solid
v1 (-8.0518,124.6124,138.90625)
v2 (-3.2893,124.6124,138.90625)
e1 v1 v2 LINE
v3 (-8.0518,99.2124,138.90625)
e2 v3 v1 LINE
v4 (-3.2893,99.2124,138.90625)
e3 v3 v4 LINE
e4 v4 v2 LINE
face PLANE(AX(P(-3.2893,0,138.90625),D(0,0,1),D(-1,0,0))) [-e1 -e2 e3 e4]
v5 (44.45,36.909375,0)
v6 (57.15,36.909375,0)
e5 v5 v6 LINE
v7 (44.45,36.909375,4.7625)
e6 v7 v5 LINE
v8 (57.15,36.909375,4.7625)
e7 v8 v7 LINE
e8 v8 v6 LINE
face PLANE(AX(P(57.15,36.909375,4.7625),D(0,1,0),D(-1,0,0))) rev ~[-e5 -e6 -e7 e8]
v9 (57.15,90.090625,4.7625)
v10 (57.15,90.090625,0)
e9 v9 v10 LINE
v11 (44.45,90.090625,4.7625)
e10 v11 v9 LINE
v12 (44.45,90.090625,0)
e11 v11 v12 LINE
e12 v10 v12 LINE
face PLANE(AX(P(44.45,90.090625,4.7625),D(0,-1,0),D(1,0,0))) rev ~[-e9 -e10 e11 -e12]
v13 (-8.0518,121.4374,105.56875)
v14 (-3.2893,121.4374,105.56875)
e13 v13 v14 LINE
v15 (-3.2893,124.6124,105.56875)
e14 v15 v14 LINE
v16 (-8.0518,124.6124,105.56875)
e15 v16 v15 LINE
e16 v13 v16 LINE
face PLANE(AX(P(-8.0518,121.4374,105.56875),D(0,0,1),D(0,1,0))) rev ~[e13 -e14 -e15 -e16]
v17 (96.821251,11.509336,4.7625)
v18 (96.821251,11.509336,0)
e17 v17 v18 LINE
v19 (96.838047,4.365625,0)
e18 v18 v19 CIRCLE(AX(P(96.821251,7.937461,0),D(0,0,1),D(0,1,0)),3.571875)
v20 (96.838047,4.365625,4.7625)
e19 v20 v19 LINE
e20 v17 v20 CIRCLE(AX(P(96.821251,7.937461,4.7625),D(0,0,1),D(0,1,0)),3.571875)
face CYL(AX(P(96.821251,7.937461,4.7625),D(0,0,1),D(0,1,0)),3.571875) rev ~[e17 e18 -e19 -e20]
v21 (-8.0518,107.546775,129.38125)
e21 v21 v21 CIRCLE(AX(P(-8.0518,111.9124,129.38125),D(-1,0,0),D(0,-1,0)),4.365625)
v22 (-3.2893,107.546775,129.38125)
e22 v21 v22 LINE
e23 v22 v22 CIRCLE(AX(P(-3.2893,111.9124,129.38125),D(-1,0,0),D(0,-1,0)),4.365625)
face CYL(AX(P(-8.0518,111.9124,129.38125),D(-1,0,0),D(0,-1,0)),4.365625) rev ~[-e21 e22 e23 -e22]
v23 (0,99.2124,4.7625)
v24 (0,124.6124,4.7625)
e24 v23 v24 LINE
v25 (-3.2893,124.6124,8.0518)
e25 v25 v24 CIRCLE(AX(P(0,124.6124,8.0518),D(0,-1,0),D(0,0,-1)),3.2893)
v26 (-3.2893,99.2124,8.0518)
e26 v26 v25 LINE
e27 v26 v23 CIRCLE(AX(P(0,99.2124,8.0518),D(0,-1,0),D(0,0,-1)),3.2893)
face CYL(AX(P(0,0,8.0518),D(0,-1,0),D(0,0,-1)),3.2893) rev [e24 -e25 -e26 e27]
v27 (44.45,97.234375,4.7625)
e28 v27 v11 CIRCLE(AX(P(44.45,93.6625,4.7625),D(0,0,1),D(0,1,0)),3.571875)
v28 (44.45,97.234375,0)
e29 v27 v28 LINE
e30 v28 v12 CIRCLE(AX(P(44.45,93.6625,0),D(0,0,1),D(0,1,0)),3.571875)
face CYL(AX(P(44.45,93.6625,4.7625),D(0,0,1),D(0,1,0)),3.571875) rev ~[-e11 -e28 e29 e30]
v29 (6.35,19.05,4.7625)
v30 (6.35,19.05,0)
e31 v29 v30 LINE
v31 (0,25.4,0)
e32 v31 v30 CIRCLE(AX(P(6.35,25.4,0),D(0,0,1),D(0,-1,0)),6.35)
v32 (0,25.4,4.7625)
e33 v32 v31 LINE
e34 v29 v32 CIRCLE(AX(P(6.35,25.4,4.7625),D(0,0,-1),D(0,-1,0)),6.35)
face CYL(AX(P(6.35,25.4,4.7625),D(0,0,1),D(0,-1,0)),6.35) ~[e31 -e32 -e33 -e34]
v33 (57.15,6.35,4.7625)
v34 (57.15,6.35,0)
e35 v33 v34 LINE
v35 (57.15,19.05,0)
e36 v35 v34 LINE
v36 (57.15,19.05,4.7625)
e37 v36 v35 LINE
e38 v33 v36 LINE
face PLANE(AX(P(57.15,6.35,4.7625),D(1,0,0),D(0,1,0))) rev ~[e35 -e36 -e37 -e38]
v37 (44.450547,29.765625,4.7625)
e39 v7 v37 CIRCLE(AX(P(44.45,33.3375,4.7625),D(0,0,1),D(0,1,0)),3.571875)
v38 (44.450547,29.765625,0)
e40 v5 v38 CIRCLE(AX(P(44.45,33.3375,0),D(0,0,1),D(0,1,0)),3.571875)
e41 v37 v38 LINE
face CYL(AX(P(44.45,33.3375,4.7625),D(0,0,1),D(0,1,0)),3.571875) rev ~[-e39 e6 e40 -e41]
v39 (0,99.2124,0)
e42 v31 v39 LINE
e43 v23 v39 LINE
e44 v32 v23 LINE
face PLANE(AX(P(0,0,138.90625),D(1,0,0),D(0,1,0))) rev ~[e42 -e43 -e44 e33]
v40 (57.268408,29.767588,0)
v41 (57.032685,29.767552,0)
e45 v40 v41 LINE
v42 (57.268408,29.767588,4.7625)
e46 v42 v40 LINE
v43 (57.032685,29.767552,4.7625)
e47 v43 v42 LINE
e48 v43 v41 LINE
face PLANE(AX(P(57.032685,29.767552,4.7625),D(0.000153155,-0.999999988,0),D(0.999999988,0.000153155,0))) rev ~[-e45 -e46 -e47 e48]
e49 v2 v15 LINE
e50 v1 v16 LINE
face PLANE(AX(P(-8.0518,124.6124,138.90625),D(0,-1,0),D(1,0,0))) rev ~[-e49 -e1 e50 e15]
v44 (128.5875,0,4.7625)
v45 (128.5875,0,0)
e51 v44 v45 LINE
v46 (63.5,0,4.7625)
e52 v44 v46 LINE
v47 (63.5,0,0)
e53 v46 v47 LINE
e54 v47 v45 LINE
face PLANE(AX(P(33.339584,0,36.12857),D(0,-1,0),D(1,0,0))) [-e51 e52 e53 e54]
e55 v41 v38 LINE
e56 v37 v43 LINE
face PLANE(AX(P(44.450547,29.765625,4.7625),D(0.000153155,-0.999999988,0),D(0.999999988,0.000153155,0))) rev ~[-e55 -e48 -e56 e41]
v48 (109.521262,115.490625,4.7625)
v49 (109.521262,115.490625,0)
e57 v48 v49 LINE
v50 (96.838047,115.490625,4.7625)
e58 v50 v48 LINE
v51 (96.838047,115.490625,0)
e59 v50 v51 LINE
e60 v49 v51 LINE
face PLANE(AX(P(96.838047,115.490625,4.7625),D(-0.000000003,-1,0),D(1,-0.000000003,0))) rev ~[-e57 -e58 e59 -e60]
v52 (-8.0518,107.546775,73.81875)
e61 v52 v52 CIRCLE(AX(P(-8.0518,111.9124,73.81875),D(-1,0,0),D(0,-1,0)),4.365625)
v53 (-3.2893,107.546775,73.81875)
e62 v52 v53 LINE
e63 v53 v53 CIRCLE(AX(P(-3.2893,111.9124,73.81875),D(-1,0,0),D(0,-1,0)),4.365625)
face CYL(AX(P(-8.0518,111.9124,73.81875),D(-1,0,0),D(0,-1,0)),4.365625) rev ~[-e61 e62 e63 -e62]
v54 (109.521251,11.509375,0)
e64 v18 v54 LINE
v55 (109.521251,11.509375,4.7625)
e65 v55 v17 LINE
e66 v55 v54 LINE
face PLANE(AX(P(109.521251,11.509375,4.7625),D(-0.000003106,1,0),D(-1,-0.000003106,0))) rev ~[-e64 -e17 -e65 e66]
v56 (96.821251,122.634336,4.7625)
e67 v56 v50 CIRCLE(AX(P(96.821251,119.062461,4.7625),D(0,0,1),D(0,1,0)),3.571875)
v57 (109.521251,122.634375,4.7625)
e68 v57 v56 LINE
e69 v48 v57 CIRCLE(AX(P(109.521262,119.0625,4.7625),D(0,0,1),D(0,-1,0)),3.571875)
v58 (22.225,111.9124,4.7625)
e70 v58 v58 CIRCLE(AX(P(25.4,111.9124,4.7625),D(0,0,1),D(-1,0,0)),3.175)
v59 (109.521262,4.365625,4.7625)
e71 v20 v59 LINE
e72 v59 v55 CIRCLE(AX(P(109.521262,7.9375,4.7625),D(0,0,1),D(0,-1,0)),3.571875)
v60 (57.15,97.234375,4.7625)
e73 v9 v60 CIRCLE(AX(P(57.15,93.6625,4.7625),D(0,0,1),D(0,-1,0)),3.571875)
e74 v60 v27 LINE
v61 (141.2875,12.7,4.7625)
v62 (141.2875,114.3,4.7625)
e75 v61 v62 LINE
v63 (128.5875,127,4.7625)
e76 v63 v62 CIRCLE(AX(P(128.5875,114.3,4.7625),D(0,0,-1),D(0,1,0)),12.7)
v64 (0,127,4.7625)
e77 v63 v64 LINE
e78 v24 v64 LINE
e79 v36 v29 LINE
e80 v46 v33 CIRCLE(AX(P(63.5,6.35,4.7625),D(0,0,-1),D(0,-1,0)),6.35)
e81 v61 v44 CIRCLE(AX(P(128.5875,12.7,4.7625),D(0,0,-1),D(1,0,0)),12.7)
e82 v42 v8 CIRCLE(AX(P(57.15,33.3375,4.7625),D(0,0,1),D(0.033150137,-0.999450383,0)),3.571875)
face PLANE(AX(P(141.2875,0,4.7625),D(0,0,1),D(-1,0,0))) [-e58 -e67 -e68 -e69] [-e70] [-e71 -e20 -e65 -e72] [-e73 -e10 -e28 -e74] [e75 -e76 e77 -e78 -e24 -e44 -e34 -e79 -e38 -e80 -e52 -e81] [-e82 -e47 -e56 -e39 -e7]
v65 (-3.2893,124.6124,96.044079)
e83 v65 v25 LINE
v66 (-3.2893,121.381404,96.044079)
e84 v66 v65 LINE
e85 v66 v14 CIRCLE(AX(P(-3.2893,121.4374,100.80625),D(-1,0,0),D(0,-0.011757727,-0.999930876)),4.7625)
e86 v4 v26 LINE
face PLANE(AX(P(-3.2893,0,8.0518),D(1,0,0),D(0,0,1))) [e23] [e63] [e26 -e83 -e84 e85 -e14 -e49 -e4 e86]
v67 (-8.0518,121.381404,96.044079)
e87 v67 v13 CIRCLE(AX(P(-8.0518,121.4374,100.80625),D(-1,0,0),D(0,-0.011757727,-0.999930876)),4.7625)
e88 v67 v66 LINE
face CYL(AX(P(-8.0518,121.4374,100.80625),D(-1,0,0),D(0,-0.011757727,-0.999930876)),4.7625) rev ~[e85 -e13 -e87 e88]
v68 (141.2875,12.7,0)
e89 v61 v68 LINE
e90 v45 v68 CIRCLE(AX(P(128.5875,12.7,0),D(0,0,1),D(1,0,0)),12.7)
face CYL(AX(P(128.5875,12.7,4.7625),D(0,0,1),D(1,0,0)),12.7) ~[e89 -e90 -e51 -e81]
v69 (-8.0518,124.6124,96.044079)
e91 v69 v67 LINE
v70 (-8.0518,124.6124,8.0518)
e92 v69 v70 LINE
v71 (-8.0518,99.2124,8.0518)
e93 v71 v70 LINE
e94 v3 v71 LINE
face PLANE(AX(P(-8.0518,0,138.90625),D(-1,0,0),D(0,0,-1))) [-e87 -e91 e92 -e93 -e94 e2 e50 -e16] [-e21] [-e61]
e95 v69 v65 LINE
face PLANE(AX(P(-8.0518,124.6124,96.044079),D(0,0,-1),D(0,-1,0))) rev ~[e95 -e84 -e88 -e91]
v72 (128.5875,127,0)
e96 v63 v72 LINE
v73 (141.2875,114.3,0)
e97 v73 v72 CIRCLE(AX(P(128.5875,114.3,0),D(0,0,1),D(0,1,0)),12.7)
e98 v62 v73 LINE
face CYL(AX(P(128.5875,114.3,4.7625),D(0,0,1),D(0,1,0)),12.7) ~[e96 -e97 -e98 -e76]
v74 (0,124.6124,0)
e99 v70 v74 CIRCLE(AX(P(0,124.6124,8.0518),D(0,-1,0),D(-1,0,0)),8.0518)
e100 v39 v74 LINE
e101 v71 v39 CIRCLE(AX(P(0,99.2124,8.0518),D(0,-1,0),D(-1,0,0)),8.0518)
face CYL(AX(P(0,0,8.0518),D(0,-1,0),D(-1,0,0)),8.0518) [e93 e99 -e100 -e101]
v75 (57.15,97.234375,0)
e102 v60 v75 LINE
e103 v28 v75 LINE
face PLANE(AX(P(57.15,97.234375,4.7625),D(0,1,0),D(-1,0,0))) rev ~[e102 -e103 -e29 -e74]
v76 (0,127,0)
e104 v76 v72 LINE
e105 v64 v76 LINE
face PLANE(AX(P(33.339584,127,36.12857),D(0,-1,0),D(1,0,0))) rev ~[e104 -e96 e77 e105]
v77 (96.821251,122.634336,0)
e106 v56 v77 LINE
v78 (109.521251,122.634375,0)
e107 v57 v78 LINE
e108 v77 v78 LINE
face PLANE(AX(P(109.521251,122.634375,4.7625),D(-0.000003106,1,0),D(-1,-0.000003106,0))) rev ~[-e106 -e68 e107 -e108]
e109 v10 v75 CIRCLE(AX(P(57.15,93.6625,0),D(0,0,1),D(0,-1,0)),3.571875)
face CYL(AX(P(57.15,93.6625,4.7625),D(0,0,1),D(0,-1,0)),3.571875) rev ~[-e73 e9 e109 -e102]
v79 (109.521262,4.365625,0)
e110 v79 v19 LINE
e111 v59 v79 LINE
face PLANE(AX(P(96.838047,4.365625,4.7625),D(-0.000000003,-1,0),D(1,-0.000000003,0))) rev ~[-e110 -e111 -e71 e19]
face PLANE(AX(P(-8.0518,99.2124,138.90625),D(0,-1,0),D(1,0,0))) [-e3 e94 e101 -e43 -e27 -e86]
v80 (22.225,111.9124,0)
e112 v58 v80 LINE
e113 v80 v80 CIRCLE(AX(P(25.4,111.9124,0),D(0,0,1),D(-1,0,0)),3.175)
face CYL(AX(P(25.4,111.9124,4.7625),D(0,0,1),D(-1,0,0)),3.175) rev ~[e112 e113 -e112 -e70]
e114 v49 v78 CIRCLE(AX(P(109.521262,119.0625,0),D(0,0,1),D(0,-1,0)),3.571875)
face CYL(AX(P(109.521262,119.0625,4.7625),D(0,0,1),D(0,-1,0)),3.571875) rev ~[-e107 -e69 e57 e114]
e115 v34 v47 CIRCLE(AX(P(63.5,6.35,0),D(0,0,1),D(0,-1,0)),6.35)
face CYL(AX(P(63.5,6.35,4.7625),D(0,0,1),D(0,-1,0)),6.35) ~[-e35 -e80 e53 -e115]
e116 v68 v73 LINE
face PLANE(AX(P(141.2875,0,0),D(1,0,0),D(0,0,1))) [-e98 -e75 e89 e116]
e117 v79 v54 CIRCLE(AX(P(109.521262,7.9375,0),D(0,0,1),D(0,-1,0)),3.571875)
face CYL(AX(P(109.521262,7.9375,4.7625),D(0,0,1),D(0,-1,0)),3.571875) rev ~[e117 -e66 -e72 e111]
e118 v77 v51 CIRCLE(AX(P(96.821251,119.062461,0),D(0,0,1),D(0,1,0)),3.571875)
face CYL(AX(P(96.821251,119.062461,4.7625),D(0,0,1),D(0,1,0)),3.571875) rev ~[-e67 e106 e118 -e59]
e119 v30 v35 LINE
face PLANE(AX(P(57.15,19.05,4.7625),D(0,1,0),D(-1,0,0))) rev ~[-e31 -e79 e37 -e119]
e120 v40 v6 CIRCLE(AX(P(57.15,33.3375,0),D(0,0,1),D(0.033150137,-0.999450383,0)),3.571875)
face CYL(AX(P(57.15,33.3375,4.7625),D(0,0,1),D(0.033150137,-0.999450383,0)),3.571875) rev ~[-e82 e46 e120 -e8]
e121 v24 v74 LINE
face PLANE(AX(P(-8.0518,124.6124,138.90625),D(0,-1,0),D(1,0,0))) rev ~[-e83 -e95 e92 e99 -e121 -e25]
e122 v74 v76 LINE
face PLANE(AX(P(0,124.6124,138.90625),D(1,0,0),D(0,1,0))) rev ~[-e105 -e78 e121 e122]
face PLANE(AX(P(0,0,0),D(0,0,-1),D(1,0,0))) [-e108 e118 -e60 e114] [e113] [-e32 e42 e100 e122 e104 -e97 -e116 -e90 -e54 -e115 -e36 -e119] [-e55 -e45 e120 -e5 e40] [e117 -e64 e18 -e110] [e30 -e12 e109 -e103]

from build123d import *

# Parameters (mm, degrees)
F1_DEPTH = 127
F2_W     = 8.0518
F2_H     = 2.3876
F2_H_2   = 99.2124
F3_DEPTH = 138.90725
F5_DEPTH = 4.7635
F6_R     = 4.365625
F7_DEPTH = 149.3403


# Not quite as in the source:
# - a feature names something its author has since deleted; it is built from what else it names


with BuildPart() as f1:
    # F0 (on Front) → F1 (new body)
    with BuildSketch(Plane.XZ):
        with BuildLine():
            ThreePointArc((-8.0518, 8.0518), (-5.6934823808, 2.3583176192), (0, 0))
            Line((0, 0), (141.2875, 0))
            Line((141.2875, 0), (141.2875, 4.7625))
            Line((141.2875, 4.7625), (0, 4.7625))
            ThreePointArc((0, 4.7625), (-2.3258863354, 5.7259136646), (-3.2893, 8.0518))
            Line((-3.2893, 8.0518), (-3.2893, 138.90625))
            Line((-3.2893, 138.90625), (-8.0518, 138.90625))
            Line((-8.0518, 138.90625), (-8.0518, 8.0518))
        make_face()
    extrude(amount=-F1_DEPTH)

    # F2 (on face) → F3 (cut, through all)
    with BuildSketch(Plane.XY.offset(138.90625)):
        with Locations((-4.0259, 125.8062)):
            Rectangle(F2_W, F2_H)
        with Locations((-4.0259, 49.6062)):
            Rectangle(F2_W, F2_H_2)
    extrude(amount=-F3_DEPTH, mode=Mode.SUBTRACT)

    # F4 (on face) → F5 (cut, through all)
    with BuildSketch(Plane.XY.offset(4.7625)):
        with BuildLine():
            Line((44.45, 90.090625), (57.15, 90.090625))
            ThreePointArc((57.15, 90.090625), (60.721875, 93.6625), (57.15, 97.234375))
            Line((57.15, 97.234375), (44.45, 97.234375))
            ThreePointArc((44.45, 97.234375), (40.878125, 93.6625), (44.45, 90.090625))
        make_face()
        with BuildLine():
            Line((96.8380470509, 115.4906250419), (109.5212624401, 115.490625))
            ThreePointArc((109.5212624401, 115.490625), (113.0931374401, 119.0625055472), (109.5212513457, 122.634375))
            Line((109.5212513457, 122.634375), (96.8212513457, 122.6343355532))
            ThreePointArc((96.8212513457, 122.6343355532), (93.2493862179, 119.0540626774), (96.8380470509, 115.4906250419))
        make_face()
        with BuildLine():
            Line((44.4505470509, 29.7656250419), (57.0326853587, 29.7675520605))
            Line((57.0326853587, 29.7675520605), (57.2684081472, 29.7675881627))
            ThreePointArc((57.2684081472, 29.7675881627), (60.7213841756, 33.3967122102), (57.15, 36.909375))
            Line((57.15, 36.909375), (44.45, 36.909375))
            ThreePointArc((44.45, 36.909375), (40.8781250105, 33.3372264746), (44.4505470509, 29.7656250419))
        make_face()
        with BuildLine():
            Line((141.2875, 127), (128.5875, 127))
            ThreePointArc((128.5875, 127), (137.5677561211, 123.2802561211), (141.2875, 114.3))
            Line((141.2875, 114.3), (141.2875, 127))
        make_face()
        with BuildLine():
            ThreePointArc((6.35, 19.05), (1.8598719395, 20.9098719395), (0, 25.4))
            Line((0, 25.4), (0, 0))
            Line((0, 0), (63.5, 0))
            ThreePointArc((63.5, 0), (59.0098719395, 1.8598719395), (57.15, 6.35))
            Line((57.15, 6.35), (57.15, 19.05))
            Line((57.15, 19.05), (6.35, 19.05))
        make_face()
        with BuildLine():
            ThreePointArc((28.575, 111.9124), (25.4, 115.0874), (22.225, 111.9124))
            ThreePointArc((22.225, 111.9124), (25.4, 108.7374), (28.575, 111.9124))
        make_face()
        with BuildLine():
            Line((96.8380470509, 4.3656250419), (109.5212624401, 4.365625))
            ThreePointArc((109.5212624401, 4.365625), (113.0931374401, 7.9375055472), (109.5212513457, 11.509375))
            Line((109.5212513457, 11.509375), (96.8212513457, 11.5093355532))
            ThreePointArc((96.8212513457, 11.5093355532), (93.2493862179, 7.9290626774), (96.8380470509, 4.3656250419))
        make_face()
        with BuildLine():
            Line((141.2875, 0), (141.2875, 12.7))
            ThreePointArc((141.2875, 12.7), (137.5677561211, 3.7197438789), (128.5875, 0))
            Line((128.5875, 0), (141.2875, 0))
        make_face()
    extrude(amount=-F5_DEPTH, mode=Mode.SUBTRACT)

    # F6 (on face) → F7 (cut, through all)
    with BuildSketch(Plane(origin=(-8.0518, 0, 0), x_dir=(0, -1, 0), z_dir=(-1, 0, 0))):
        with BuildLine():
            Line((-121.4374, 105.56875), (-124.6124, 105.56875))
            Line((-124.6124, 105.56875), (-124.6124, 96.0440792053))
            Line((-124.6124, 96.0440792053), (-121.4933961759, 96.0440792053))
            Line((-121.4933961759, 96.0440792053), (-121.3814038241, 96.0440792053))
            ThreePointArc((-121.3814038241, 96.0440792053), (-116.674982302, 100.8342485718), (-121.4374, 105.56875))
        make_face()
        with Locations((-111.9124, 129.38125)):
            Circle(F6_R)
        with Locations((-111.9124, 73.81875)):
            Circle(F6_R)
    extrude(amount=-F7_DEPTH, mode=Mode.SUBTRACT)


solid = f1.part
